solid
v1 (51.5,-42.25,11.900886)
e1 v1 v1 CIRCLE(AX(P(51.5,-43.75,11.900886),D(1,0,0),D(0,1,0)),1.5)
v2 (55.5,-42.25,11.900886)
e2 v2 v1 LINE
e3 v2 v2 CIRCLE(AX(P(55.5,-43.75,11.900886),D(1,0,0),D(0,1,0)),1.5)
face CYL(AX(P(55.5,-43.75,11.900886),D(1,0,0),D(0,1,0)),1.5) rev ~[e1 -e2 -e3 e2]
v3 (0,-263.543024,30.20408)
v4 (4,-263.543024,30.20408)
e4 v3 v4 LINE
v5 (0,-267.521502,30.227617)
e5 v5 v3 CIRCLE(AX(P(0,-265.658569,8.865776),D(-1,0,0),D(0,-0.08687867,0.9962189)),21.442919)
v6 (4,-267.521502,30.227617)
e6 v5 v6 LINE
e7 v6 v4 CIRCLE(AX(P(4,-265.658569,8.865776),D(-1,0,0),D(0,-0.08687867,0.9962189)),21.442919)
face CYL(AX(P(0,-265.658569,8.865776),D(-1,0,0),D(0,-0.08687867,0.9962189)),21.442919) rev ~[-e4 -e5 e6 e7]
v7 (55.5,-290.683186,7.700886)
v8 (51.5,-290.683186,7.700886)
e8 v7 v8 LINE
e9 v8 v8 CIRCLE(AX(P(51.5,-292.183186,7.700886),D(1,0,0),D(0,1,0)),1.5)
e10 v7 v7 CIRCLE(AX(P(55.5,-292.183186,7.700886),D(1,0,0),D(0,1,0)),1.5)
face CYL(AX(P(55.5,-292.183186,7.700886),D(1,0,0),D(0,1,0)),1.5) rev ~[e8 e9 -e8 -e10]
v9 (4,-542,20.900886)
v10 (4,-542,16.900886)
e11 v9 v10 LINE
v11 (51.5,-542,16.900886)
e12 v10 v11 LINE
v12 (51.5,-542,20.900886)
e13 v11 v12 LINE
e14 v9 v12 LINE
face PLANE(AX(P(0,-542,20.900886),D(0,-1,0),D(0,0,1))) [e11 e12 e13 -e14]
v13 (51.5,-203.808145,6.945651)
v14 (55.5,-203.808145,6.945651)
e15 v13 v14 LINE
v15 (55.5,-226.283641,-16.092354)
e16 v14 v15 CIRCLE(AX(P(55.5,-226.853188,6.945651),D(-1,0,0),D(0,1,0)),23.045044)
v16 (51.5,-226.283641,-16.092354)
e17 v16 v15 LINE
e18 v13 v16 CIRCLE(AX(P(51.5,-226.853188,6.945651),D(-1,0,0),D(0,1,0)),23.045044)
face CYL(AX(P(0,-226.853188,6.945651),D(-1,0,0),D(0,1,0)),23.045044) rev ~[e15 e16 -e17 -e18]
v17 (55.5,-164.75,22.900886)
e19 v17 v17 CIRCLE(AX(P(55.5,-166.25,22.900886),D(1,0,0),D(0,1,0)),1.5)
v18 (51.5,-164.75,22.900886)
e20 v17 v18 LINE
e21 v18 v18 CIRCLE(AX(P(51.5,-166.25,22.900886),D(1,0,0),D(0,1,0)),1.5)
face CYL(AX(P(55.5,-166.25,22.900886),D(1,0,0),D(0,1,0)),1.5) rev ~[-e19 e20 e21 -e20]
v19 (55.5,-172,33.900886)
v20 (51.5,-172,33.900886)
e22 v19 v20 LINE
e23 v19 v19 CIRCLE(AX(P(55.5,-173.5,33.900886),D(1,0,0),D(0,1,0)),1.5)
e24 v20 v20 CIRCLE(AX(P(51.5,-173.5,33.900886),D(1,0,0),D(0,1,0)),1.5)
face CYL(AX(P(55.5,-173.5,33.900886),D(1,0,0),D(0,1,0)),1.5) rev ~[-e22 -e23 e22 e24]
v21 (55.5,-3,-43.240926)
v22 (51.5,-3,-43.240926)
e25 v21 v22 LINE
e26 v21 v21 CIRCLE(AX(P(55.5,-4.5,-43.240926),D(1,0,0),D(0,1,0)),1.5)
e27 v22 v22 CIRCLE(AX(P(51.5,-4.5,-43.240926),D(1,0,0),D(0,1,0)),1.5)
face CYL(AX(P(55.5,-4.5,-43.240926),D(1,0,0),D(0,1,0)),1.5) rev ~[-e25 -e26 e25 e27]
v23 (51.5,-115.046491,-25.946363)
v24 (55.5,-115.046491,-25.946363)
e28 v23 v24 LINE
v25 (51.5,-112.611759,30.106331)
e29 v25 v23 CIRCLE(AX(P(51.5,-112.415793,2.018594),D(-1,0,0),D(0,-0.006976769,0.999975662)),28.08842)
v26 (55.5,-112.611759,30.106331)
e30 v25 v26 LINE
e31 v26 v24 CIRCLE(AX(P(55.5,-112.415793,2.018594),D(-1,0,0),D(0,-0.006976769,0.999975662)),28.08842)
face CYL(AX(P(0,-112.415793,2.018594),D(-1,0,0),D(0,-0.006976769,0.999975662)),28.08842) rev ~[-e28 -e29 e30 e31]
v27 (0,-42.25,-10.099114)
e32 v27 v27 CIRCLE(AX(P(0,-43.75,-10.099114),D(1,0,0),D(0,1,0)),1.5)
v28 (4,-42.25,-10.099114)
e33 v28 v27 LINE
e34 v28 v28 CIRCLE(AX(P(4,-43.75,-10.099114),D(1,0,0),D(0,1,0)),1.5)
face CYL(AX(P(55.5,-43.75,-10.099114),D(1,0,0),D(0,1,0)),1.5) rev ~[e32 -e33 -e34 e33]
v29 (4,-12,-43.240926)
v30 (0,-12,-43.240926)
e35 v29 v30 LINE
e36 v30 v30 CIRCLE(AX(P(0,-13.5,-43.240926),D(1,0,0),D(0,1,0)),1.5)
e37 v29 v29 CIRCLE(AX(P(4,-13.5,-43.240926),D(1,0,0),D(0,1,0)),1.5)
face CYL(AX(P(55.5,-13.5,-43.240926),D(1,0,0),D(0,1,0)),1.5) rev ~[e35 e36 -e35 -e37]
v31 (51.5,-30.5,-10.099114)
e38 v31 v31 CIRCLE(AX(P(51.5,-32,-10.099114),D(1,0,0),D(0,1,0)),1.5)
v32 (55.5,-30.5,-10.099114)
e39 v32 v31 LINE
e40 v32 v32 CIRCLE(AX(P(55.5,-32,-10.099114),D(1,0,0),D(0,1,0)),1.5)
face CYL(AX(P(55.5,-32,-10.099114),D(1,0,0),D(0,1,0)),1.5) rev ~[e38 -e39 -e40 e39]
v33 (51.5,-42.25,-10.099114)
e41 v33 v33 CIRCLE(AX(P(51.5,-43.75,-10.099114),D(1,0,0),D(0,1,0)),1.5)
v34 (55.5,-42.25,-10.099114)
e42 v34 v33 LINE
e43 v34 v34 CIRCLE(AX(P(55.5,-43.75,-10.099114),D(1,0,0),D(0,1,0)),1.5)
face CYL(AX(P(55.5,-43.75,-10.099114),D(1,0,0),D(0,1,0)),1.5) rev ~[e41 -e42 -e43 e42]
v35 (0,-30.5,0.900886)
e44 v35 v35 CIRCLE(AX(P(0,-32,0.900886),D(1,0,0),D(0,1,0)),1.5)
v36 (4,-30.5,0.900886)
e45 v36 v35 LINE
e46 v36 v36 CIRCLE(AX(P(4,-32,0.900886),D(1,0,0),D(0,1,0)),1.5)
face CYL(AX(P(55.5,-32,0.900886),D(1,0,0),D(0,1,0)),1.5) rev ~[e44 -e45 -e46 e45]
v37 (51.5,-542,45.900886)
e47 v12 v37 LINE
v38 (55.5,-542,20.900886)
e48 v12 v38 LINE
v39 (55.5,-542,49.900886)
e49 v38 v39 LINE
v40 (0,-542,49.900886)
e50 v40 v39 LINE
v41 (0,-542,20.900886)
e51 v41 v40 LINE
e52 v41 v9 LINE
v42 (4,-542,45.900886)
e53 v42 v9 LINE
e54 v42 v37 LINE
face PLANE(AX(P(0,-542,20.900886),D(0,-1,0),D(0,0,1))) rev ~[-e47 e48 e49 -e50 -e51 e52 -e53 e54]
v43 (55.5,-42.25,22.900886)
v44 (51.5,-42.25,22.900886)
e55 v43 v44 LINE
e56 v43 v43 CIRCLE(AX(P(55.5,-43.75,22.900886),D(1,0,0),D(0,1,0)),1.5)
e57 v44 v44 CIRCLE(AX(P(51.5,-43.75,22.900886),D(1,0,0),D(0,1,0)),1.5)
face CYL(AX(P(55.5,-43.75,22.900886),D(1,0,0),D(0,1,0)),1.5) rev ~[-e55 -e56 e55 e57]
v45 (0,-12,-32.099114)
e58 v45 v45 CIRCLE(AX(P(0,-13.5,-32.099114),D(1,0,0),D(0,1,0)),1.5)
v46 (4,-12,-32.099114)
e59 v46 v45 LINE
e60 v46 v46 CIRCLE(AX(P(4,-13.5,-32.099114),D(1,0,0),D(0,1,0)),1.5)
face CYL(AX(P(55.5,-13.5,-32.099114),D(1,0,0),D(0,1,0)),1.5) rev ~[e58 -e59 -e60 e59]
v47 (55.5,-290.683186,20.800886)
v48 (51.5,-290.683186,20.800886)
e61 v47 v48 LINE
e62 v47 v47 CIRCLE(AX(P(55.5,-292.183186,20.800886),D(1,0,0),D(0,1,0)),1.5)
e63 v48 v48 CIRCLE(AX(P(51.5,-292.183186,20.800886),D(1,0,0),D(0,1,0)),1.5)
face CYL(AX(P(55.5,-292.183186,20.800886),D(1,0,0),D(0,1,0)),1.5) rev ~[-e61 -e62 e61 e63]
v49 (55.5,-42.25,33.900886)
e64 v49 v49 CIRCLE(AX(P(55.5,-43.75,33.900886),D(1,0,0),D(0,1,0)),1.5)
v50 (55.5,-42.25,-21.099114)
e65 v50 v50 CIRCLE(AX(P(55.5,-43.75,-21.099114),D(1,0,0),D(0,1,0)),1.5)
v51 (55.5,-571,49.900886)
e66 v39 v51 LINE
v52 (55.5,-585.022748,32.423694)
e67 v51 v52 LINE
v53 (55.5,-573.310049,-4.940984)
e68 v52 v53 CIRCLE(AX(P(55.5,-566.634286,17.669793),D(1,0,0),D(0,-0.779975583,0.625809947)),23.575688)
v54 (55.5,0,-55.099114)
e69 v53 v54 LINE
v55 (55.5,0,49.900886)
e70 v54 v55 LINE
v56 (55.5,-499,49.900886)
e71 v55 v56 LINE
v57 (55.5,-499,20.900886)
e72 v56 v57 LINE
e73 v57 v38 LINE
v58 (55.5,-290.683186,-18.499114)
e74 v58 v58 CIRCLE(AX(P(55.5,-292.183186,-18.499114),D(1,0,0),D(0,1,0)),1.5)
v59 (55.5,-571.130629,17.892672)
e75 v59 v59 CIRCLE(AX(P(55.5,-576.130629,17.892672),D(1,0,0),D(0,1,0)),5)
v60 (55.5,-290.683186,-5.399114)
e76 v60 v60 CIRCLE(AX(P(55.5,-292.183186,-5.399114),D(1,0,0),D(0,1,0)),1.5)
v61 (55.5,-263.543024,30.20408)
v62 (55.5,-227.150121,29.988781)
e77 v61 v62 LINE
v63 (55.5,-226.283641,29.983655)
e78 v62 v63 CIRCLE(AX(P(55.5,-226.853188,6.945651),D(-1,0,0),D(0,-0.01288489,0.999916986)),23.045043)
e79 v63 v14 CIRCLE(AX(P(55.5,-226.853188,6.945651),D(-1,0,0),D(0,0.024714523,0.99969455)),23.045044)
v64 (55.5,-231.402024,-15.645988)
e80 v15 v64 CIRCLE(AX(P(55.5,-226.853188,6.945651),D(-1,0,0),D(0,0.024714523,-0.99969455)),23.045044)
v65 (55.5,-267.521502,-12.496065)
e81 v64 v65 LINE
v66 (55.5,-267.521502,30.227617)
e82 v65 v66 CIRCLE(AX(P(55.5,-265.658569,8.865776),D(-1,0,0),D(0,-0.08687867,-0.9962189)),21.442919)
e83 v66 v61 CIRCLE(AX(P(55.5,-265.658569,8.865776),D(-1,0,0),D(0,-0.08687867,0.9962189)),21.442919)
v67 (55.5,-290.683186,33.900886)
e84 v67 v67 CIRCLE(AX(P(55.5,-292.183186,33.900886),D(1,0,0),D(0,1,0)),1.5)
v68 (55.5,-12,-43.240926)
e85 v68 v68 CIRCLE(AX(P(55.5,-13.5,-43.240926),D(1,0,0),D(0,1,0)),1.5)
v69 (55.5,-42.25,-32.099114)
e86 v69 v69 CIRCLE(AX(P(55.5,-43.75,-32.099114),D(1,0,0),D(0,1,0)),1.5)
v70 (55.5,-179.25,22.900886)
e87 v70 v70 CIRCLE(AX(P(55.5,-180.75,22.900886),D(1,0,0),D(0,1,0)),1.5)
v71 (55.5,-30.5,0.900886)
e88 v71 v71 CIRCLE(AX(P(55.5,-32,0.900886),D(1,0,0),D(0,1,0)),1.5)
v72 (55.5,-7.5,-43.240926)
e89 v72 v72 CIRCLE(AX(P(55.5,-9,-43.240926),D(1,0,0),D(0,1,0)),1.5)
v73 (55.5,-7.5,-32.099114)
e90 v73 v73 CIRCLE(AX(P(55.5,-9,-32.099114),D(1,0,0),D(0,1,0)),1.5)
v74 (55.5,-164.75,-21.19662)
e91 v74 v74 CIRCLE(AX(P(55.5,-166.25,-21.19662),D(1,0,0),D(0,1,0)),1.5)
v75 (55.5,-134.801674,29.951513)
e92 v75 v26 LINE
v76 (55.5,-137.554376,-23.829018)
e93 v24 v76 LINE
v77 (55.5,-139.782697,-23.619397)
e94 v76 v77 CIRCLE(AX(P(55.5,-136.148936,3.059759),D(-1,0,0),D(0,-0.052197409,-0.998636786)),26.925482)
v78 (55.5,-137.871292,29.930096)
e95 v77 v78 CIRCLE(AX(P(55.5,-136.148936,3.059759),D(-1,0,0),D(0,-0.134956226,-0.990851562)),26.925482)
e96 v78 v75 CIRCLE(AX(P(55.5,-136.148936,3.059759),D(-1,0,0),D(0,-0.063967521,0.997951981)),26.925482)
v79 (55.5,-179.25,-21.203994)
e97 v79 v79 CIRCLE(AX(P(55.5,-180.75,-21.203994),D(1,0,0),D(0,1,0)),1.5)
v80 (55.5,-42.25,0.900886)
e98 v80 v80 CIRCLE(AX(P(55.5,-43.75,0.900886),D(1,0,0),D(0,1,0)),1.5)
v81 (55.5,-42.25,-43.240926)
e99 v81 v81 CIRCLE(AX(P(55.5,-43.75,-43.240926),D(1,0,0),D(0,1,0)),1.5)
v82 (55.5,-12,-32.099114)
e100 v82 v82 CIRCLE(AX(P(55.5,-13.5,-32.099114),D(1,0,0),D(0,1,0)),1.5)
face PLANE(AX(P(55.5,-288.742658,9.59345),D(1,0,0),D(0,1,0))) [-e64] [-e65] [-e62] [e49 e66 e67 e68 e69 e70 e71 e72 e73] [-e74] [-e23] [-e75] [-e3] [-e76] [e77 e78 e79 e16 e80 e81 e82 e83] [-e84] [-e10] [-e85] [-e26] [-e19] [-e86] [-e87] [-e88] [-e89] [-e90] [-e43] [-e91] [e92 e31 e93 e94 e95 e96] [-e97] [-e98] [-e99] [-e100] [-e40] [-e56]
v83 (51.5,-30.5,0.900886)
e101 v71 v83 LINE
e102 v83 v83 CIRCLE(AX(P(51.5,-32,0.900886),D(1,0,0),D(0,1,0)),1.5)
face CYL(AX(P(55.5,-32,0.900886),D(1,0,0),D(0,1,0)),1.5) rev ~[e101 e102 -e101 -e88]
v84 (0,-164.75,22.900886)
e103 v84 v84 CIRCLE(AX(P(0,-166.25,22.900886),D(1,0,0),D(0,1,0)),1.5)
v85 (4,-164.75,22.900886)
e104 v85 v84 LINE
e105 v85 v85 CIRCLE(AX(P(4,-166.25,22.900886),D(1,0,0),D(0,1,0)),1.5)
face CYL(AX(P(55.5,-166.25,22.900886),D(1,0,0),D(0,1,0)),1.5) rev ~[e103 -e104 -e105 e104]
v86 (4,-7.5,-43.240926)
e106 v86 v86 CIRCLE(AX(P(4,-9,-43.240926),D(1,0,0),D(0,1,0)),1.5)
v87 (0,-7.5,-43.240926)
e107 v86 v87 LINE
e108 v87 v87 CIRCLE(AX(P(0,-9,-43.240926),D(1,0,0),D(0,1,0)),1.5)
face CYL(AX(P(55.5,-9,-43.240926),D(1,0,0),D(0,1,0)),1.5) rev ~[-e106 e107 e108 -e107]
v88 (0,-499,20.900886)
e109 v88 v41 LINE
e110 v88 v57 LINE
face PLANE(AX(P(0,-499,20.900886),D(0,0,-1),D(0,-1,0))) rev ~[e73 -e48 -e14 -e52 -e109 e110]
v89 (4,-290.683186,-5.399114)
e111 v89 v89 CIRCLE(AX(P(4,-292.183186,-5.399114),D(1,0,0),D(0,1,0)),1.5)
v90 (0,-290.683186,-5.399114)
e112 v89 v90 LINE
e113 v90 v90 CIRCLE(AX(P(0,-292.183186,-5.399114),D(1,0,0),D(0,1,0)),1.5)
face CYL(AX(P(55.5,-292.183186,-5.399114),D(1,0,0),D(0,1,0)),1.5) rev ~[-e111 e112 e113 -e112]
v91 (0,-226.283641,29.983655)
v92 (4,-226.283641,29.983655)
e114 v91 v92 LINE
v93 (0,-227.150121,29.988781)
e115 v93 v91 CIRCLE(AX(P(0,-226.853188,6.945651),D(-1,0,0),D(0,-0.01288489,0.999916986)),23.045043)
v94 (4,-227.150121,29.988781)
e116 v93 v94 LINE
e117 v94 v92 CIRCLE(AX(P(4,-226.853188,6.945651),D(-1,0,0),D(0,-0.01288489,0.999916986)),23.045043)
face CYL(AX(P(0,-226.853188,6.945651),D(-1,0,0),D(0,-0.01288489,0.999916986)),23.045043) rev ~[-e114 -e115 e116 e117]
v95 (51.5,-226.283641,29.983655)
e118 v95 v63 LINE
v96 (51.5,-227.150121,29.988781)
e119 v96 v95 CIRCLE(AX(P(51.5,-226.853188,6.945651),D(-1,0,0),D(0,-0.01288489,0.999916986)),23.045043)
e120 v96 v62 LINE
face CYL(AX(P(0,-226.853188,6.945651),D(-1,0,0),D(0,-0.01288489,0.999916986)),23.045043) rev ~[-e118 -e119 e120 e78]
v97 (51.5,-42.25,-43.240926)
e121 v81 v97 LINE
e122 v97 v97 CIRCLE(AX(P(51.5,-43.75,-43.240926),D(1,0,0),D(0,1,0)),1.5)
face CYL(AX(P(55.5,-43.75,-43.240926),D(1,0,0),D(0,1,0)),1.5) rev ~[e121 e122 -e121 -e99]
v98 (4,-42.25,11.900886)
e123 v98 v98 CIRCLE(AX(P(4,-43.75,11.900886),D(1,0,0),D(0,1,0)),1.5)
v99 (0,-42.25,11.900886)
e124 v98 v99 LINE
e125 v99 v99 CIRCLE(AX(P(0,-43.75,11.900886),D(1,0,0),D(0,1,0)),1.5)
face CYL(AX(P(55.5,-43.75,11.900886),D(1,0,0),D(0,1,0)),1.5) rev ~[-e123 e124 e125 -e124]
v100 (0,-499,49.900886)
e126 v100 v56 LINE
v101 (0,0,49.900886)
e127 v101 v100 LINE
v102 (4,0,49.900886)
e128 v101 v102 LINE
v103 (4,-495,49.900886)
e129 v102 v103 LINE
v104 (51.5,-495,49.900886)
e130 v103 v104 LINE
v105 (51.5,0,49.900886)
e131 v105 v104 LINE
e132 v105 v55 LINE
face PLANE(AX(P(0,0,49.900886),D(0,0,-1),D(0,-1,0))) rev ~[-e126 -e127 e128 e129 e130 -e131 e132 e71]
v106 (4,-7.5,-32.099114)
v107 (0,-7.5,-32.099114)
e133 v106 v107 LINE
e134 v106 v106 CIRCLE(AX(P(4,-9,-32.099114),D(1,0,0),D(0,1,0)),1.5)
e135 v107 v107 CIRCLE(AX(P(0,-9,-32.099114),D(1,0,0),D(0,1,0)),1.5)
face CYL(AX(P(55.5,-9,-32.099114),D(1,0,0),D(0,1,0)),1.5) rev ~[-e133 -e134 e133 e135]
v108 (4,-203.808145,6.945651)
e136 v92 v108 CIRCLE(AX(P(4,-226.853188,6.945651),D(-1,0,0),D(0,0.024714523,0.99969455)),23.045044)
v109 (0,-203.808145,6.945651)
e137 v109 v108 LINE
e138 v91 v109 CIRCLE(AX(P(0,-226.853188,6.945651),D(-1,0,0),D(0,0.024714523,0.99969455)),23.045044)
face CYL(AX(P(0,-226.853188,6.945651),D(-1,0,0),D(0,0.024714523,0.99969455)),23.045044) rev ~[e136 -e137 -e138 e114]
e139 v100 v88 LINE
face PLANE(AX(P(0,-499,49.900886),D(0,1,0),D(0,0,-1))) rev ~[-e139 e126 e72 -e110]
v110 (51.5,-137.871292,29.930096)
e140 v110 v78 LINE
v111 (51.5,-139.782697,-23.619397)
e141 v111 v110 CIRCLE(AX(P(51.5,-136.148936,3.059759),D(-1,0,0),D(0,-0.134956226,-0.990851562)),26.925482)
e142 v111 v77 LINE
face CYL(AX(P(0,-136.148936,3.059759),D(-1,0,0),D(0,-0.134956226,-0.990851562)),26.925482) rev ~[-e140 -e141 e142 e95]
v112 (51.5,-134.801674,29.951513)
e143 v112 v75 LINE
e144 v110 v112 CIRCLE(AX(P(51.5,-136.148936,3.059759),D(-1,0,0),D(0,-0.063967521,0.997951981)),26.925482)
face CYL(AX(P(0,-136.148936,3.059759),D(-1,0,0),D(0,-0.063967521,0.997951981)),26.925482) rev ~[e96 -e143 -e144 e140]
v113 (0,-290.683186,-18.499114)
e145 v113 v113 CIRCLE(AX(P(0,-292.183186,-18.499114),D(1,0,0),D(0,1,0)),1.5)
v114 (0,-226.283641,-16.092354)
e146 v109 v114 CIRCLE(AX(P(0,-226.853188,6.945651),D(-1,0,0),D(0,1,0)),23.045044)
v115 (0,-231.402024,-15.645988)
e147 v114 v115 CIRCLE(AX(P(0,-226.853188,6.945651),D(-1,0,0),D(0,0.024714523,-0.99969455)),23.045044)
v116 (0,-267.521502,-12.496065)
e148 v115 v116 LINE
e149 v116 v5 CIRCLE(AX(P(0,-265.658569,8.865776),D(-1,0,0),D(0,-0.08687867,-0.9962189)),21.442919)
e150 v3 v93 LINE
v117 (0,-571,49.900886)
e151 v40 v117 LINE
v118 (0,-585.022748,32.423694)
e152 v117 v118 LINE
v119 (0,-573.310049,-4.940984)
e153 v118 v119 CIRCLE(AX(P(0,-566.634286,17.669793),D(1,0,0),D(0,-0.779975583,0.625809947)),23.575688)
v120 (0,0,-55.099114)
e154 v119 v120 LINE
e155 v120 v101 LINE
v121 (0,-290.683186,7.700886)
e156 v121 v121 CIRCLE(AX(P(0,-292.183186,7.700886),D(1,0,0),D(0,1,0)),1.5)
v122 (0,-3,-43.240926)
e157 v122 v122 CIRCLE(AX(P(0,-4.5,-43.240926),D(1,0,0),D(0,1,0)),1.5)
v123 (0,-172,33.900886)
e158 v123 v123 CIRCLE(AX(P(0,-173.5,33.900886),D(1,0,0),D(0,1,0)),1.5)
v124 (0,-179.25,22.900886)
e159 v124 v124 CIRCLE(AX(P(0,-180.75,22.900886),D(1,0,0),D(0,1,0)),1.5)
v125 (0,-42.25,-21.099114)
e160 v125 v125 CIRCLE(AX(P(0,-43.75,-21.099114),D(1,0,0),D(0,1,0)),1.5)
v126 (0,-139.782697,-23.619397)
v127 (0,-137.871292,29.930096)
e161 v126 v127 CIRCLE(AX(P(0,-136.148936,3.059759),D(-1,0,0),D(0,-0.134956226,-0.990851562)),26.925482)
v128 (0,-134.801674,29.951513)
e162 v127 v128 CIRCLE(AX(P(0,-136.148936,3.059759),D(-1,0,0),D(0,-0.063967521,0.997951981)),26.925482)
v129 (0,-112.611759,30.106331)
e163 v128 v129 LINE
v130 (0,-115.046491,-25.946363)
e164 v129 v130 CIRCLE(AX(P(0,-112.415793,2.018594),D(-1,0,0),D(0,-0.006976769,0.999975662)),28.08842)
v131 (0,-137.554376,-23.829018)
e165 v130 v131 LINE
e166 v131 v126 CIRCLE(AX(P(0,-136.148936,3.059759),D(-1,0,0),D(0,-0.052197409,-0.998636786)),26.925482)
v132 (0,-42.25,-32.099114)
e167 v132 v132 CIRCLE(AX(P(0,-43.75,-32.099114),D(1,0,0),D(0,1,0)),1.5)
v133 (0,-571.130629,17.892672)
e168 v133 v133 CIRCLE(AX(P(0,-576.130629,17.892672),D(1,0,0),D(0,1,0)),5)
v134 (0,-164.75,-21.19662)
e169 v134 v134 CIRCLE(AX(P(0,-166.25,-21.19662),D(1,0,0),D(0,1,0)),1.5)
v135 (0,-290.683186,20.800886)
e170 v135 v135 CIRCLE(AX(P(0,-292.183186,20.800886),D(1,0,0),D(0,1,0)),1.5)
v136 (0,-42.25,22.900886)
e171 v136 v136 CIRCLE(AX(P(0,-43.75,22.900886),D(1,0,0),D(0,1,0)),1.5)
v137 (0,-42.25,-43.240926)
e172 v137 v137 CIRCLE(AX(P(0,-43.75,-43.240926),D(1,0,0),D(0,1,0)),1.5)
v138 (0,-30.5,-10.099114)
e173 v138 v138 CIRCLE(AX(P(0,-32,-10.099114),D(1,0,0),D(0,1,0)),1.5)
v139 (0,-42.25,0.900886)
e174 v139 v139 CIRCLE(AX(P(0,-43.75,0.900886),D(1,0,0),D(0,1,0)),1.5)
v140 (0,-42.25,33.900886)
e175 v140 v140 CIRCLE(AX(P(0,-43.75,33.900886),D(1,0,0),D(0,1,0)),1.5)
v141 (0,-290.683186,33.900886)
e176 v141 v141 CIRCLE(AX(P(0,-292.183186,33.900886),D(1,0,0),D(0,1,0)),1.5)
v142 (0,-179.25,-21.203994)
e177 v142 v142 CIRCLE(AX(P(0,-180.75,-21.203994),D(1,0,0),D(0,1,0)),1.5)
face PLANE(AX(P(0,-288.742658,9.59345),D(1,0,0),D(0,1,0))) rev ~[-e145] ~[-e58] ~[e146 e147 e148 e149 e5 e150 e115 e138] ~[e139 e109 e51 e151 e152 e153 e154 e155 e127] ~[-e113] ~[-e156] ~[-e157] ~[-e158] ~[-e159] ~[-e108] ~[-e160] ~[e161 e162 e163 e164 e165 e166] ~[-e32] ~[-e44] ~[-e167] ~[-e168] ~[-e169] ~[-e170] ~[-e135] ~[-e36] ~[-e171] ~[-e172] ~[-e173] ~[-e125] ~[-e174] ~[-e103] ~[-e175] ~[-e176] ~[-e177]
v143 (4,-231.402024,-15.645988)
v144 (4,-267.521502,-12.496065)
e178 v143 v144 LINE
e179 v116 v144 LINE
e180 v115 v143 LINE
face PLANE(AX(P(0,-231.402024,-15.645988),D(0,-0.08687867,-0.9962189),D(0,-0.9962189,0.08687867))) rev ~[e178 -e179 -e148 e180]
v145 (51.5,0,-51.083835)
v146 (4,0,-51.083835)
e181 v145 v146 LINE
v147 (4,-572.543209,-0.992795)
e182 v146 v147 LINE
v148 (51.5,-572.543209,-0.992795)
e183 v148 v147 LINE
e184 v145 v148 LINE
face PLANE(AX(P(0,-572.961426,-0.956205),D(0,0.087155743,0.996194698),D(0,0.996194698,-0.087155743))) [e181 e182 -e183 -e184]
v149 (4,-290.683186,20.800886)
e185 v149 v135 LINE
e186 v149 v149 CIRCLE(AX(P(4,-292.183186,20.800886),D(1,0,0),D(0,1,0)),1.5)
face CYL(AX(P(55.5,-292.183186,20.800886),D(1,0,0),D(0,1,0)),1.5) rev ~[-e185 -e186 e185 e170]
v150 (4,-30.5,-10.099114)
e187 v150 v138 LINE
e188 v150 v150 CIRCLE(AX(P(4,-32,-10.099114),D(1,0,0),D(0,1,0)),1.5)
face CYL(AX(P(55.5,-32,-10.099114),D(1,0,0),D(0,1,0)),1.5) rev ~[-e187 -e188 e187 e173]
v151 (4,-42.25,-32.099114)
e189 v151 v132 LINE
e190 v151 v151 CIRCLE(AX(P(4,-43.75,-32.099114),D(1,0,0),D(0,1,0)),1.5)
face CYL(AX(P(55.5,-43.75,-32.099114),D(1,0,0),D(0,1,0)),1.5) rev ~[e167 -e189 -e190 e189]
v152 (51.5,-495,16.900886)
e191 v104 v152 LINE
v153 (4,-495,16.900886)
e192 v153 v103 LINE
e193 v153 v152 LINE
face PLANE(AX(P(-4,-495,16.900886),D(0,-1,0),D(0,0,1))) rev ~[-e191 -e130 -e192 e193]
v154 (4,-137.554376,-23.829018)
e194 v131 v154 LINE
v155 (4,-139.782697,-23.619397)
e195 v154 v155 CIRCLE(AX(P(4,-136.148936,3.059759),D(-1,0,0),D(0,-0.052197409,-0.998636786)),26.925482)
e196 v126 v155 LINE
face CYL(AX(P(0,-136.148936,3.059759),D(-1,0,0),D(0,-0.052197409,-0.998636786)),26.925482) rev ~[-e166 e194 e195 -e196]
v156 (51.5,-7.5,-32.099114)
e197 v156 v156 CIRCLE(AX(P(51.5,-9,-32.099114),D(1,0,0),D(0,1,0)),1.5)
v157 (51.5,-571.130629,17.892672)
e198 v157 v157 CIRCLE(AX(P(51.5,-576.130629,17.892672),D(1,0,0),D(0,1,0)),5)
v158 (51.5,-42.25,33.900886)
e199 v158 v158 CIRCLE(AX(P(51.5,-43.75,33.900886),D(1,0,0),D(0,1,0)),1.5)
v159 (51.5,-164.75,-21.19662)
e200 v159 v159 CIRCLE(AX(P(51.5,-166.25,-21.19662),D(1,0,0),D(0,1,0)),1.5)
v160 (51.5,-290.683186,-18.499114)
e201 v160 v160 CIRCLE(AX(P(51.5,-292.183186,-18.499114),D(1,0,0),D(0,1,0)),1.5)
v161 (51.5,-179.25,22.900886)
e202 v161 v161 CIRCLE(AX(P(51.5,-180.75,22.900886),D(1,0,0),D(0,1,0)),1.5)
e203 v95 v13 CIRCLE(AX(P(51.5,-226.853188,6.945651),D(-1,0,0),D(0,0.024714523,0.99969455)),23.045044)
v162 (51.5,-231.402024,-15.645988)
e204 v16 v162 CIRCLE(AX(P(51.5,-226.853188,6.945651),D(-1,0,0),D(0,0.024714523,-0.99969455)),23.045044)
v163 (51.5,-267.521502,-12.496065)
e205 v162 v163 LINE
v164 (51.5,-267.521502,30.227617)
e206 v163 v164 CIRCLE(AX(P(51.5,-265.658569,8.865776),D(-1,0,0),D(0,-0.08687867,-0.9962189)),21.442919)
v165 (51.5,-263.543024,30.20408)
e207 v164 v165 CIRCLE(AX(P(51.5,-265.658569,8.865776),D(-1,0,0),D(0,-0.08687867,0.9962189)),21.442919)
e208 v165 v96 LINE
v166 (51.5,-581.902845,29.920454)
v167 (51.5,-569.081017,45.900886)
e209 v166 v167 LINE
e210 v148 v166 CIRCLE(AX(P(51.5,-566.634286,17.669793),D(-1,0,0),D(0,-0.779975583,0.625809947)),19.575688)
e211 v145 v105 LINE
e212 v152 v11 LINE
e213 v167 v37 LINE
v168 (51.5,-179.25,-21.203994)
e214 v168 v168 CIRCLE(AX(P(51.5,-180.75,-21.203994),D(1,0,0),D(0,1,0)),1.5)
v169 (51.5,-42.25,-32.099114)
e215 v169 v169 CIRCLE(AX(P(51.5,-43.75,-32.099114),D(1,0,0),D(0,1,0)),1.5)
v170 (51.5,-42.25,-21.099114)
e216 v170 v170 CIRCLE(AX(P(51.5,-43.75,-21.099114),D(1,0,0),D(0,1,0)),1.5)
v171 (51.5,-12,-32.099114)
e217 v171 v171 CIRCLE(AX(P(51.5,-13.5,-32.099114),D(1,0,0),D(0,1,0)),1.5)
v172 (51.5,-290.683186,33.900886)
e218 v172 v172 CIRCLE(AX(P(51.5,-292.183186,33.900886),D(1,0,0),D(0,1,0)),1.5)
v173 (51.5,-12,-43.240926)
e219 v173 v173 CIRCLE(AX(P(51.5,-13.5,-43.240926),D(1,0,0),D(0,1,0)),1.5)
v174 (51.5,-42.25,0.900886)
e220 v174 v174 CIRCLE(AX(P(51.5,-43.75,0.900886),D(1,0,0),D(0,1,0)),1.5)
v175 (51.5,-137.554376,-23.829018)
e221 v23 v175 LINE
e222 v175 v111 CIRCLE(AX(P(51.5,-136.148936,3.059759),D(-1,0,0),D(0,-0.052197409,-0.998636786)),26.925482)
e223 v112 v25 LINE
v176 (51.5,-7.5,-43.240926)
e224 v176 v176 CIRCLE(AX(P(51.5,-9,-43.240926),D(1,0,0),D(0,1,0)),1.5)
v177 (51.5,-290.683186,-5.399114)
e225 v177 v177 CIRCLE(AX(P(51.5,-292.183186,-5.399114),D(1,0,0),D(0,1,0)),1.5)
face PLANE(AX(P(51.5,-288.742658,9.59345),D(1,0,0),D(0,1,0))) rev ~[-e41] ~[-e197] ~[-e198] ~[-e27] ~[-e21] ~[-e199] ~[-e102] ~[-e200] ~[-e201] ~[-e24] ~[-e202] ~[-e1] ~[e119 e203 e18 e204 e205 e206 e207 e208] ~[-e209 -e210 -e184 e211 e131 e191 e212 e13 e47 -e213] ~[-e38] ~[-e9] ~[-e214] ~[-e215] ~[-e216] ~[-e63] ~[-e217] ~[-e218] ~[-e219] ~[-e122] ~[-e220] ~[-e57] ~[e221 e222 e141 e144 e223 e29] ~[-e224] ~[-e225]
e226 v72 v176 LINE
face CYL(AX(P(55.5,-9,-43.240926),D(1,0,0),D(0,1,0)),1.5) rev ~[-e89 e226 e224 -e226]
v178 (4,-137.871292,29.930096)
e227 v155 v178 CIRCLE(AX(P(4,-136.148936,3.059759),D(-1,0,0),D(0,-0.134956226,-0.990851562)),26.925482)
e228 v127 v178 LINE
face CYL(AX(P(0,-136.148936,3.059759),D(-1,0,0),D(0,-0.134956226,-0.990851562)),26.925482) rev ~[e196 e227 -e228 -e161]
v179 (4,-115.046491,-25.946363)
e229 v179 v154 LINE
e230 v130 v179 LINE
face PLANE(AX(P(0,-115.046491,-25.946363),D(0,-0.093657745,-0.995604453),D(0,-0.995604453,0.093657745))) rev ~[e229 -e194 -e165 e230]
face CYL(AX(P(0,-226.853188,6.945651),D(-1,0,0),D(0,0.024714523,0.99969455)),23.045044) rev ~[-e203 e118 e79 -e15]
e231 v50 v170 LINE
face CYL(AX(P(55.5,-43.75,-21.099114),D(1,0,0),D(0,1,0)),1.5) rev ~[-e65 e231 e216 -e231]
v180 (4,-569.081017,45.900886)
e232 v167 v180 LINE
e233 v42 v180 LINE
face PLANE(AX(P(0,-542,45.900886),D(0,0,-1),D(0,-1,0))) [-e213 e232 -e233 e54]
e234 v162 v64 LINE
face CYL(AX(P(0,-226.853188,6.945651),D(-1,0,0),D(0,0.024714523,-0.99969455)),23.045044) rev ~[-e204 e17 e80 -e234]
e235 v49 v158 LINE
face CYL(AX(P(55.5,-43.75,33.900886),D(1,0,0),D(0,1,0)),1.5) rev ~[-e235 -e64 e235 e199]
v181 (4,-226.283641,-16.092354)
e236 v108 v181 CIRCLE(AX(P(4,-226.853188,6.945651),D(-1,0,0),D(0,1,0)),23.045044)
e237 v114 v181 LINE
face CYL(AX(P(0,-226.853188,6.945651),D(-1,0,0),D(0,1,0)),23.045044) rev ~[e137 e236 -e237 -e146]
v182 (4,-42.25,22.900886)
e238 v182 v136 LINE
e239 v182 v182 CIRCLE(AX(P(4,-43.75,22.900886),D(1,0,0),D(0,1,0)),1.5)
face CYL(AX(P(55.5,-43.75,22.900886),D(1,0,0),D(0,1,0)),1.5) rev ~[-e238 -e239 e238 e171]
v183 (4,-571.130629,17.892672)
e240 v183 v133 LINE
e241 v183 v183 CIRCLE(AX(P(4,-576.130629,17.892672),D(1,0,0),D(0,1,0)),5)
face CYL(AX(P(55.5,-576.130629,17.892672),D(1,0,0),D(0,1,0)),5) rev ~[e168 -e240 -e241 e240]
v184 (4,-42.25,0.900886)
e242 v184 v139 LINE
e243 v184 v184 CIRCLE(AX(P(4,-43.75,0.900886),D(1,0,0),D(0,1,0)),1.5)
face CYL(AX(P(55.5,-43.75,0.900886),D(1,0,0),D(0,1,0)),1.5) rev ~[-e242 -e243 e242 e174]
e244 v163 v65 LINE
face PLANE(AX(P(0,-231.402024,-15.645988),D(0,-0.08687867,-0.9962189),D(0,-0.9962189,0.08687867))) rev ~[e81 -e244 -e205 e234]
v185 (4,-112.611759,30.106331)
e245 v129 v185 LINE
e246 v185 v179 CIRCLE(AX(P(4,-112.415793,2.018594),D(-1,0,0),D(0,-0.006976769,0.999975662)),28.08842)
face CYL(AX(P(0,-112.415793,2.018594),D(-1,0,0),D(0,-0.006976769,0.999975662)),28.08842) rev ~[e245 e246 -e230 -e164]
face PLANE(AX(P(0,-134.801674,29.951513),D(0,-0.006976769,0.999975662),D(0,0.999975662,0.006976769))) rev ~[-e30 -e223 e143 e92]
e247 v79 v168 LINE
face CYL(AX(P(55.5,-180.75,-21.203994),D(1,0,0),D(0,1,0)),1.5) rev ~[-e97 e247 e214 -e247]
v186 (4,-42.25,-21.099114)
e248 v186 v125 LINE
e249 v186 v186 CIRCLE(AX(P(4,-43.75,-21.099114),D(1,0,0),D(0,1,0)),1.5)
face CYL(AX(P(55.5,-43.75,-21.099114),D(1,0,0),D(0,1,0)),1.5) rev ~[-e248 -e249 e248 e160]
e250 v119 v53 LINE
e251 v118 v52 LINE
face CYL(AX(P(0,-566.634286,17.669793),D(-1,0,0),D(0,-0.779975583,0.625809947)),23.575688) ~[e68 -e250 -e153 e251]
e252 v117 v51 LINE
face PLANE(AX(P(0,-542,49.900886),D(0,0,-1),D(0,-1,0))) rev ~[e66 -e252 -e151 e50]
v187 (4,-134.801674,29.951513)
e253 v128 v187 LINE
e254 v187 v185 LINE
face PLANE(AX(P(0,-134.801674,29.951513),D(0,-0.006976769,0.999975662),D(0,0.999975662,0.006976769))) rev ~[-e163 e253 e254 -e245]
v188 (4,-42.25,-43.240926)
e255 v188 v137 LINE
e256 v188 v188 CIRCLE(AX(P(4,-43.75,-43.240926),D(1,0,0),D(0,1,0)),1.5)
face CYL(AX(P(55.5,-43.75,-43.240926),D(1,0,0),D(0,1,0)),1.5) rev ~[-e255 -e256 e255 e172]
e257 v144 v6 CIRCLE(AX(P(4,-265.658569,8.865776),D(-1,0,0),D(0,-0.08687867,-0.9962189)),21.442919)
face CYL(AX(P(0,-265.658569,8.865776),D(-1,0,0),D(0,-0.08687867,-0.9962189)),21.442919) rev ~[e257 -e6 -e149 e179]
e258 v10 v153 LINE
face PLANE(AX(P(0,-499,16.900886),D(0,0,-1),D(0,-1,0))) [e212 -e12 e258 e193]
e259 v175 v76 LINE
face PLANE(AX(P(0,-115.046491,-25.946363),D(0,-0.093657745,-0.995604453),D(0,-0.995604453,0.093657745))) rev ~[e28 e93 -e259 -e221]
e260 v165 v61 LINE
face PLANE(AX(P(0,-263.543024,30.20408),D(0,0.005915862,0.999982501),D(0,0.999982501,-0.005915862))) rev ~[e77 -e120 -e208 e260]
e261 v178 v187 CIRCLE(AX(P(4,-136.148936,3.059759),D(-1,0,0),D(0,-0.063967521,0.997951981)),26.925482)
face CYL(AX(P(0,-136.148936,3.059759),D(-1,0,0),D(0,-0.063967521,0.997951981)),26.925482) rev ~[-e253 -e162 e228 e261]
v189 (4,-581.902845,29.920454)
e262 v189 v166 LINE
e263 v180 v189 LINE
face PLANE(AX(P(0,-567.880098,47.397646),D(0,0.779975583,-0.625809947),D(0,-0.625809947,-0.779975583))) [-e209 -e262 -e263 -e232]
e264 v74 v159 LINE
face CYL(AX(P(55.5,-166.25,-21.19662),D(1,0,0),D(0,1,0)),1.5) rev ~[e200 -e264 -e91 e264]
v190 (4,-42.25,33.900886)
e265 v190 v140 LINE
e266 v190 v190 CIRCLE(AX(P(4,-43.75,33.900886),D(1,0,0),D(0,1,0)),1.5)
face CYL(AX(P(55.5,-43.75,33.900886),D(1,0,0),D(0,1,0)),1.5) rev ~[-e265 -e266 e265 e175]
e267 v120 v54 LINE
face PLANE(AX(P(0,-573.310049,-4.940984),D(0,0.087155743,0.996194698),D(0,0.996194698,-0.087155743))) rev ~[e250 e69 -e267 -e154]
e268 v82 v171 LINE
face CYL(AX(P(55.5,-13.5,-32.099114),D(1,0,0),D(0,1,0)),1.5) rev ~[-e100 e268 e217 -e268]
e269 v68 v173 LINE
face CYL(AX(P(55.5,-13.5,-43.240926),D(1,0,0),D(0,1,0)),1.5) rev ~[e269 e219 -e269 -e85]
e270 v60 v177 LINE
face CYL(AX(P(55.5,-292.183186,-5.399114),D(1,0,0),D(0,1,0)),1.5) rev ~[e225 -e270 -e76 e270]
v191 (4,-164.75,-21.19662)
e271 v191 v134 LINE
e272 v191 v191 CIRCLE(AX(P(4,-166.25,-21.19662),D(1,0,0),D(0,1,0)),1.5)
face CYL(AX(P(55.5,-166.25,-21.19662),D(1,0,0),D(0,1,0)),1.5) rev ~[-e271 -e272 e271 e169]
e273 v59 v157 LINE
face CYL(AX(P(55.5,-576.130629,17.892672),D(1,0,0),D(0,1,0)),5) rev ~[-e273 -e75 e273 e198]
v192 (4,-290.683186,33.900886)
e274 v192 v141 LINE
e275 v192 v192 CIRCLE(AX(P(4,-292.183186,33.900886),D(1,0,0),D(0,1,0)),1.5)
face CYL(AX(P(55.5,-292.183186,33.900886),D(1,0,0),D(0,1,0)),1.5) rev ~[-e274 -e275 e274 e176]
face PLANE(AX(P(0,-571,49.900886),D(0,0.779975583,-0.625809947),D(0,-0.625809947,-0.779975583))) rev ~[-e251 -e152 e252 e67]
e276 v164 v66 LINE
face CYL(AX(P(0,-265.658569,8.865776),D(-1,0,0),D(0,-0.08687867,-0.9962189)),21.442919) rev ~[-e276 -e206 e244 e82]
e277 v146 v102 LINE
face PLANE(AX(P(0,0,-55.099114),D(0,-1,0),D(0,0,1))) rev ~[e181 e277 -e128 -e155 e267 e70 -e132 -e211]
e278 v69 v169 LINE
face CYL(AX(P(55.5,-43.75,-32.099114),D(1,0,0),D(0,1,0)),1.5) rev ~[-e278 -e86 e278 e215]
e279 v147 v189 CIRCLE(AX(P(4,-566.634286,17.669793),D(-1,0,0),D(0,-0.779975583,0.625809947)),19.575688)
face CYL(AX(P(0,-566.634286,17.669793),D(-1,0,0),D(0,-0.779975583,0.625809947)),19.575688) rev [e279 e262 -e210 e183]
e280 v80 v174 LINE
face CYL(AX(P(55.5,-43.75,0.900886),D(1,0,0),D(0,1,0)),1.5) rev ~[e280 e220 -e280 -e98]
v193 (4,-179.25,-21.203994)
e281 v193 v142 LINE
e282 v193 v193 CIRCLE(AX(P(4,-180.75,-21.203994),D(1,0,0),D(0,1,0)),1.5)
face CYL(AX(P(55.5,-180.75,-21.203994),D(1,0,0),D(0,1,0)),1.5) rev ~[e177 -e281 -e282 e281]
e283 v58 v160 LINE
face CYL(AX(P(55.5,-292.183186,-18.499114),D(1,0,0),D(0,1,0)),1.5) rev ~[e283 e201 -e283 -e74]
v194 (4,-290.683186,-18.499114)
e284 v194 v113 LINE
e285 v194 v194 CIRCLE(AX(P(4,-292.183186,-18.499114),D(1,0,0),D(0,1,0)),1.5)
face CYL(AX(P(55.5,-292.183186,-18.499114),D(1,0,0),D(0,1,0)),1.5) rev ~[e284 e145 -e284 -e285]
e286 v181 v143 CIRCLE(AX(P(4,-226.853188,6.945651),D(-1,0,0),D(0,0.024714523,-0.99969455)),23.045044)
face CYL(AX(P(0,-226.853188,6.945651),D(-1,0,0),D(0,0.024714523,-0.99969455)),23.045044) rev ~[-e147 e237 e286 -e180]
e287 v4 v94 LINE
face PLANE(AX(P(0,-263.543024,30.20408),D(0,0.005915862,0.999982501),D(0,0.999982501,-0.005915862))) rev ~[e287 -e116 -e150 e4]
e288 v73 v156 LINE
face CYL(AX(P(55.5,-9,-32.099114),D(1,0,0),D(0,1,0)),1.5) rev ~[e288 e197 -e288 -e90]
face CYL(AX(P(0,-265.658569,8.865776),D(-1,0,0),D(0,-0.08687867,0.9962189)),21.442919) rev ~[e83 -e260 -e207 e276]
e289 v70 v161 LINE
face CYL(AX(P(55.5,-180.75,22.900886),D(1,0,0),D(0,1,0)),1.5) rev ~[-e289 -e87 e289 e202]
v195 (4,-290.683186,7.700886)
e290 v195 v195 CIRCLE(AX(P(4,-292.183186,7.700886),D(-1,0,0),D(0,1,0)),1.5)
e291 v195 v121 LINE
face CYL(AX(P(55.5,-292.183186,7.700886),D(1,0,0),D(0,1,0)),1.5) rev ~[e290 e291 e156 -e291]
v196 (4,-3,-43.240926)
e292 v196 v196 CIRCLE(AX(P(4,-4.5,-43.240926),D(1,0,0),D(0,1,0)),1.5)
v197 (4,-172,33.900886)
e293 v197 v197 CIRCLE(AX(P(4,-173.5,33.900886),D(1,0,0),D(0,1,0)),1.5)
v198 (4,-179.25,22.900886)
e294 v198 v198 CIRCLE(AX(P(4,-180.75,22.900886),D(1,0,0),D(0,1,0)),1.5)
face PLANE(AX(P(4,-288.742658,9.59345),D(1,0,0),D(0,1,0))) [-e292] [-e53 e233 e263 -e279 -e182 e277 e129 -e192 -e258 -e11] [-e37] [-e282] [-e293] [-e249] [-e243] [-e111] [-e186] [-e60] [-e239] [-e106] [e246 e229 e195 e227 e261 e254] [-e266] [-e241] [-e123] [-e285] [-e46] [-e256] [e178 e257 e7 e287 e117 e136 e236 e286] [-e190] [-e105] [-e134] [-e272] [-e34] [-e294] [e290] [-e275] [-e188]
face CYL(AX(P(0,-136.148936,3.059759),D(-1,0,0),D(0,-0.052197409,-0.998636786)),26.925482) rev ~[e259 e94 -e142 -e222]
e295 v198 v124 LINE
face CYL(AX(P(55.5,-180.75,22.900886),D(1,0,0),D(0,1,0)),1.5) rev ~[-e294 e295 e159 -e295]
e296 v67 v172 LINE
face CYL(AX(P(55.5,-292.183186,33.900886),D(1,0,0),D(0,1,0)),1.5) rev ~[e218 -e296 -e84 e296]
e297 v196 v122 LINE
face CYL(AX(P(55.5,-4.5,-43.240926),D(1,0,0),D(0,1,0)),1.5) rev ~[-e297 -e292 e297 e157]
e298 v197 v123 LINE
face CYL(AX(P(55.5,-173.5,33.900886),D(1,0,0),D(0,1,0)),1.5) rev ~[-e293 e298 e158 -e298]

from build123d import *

# Parameters (mm, degrees)
F1_DEPTH    = 55.5
F2_T        = 4
F2_T3_DEPTH = 63.5
F3_R        = 1.5
F3_R_2      = 5
F4_DEPTH    = 132
F6_START    = -4
F6_DEPTH    = 47.5


# Not quite as in the source:
# - a shell that OpenCascade refuses in one call is made with other operations: the cavity is built on its own and cut out


with BuildPart() as f1:
    # F0 (on Right) → F1 (new body)
    with BuildSketch(Plane.YZ):
        with BuildLine():
            Line((0, -55.0991142094), (0, 49.9008857906))
            Line((0, 49.9008857906), (-499, 49.9008857906))
            Line((-499, 49.9008857906), (-499, 20.9008857906))
            Line((-499, 20.9008857906), (-542, 20.9008857906))
            Line((-542, 20.9008857906), (-542, 49.9008857906))
            Line((-542, 49.9008857906), (-571, 49.9008857906))
            Line((-571, 49.9008857906), (-585.0227475166, 32.4236936867))
            ThreePointArc((-585.0227475166, 32.4236936867), (-589.1305886162, 10.6178817454), (-573.3100487518, -4.9409842581))
            Line((-573.3100487518, -4.9409842581), (0, -55.0991142094))
        make_face()
        with BuildLine():
            ThreePointArc((-267.5215016214, -12.4960653082), (-287.1014882349, 8.865775765), (-267.5215016214, 30.2276168381))
            ThreePointArc((-267.5215016214, 30.2276168381), (-265.5317159892, 30.3083194328), (-263.5430244658, 30.2040803041))
            Line((-263.5430244658, 30.2040803041), (-227.1501212267, 29.9887811395))
            ThreePointArc((-227.1501212267, 29.9887811395), (-226.7168570765, 29.9902909304), (-226.2836411156, 29.983655073))
            ThreePointArc((-226.2836411156, 29.983655073), (-210.3577454889, 23.0383320758), (-203.8081448594, 6.9456506758))
            ThreePointArc((-203.8081448594, 6.9456506758), (-210.3577454889, -9.1470307242), (-226.2836411156, -16.0923537213))
            ThreePointArc((-226.2836411156, -16.0923537213), (-228.8553111139, -16.012257226), (-231.40202441, -15.6459876318))
            Line((-231.40202441, -15.6459876318), (-267.5215016214, -12.4960653082))
        make_face(mode=Mode.SUBTRACT)
        with BuildLine():
            ThreePointArc((-112.6117591226, 30.1063306123), (-92.6236860119, 21.9492705288), (-84.3273722818, 2.0185938124))
            ThreePointArc((-84.3273722818, 2.0185938124), (-93.5072337014, -18.7521971721), (-115.0464908191, -25.9463626291))
            Line((-115.0464908191, -25.9463626291), (-137.5543760441, -23.8290179612))
            ThreePointArc((-137.5543760441, -23.8290179612), (-138.6707155639, -23.7473709318), (-139.7826970584, -23.6193970408))
            ThreePointArc((-139.7826970584, -23.6193970408), (-163.0572812206, 4.0202298169), (-137.871291965, 29.9300963926))
            ThreePointArc((-137.871291965, 29.9300963926), (-136.3367885283, 29.9845849808), (-134.8016741863, 29.9515129286))
            Line((-134.8016741863, 29.9515129286), (-112.6117591226, 30.1063306123))
        make_face(mode=Mode.SUBTRACT)
    extrude(amount=F1_DEPTH)

    # F2: shell of thickness 4, made by hand


with BuildPart() as f2_core1:
    # F2_t2: copy of F1
    add(f1.part)

    # the walls: a layer under each face that stays
    f2_faces = [f2_core1.faces().sort_by_distance(p)[0] for p in [
        (55.5, -295.1049872852, -2.5991142094),
        (27.75, -163.0392168361, 4.4361103036),
        (27.75, -126.3004334316, -24.8876902951),
        (27.75, -84.3538324473, 0.7996810334),
        (27.75, -123.7067166544, 30.0289217705),
        (27.75, -203.9075264936, 4.8077471556),
        (27.75, -245.3465728463, 30.0964307218),
        (27.75, -287.0090157551, 10.8550491528),
        (27.75, -249.4617630157, -14.07102647),
        (27.75, -589.1305886162, 10.6178817454),
        (27.75, -578.0113737583, 41.1622897387),
        (27.75, -556.5, 49.9008857906),
        (27.75, -520.5, 20.9008857906),
        (27.75, -499, 35.4008857906),
        (0, -295.1049872852, -2.5991142094),
        (27.75, -286.6550243759, -30.0200492338),
    ]]
    thicken(f2_faces, amount=-F2_T, mode=Mode.SUBTRACT)

    # F2_s4 → F2_t3 (cut)
    with BuildSketch(Plane.YZ.offset(-4)):
        Polygon((-499.04, 20.9408857906), (-499, 16.9008857906), (-495, 16.9008857906), (-495, 20.9008857906), align=None)
    extrude(amount=F2_T3_DEPTH, mode=Mode.SUBTRACT)


with BuildPart() as f1_1:
    add(f1.part)

    # what is left inside the walls is the cavity
    f2_cavity = [f2_core1.part.solids().sort_by_distance(p)[0] for p in [
        (51.46, -293.104987, -17.422261),
    ]]
    add(f2_cavity, mode=Mode.SUBTRACT)

    # F3 (on face) → F4 (cut)
    with BuildSketch(Plane.YZ.offset(55.5)):
        with Locations((-43.75, 33.9008857906)):
            Circle(F3_R)
        with Locations((-43.75, 22.9008857906)):
            Circle(F3_R)
        with Locations((-43.75, 11.9008857906)):
            Circle(F3_R)
        with Locations((-43.75, 0.9008857906)):
            Circle(F3_R)
        with Locations((-43.75, -10.0991142094)):
            Circle(F3_R)
        with Locations((-43.75, -21.0991142094)):
            Circle(F3_R)
        with Locations((-43.75, -43.2409264798)):
            Circle(F3_R)
        with Locations((-43.75, -32.0991142094)):
            Circle(F3_R)
        with Locations((-32, 0.9008857906)):
            Circle(F3_R)
        with Locations((-32, -10.0991142094)):
            Circle(F3_R)
        with Locations((-4.5, -43.2409264798)):
            Circle(F3_R)
        with Locations((-9, -43.2409264798)):
            Circle(F3_R)
        with Locations((-9, -32.0991142094)):
            Circle(F3_R)
        with Locations((-13.5, -32.0991142094)):
            Circle(F3_R)
        with Locations((-13.5, -43.2409264798)):
            Circle(F3_R)
        with Locations((-166.25, -21.1966199487)):
            Circle(F3_R)
        with Locations((-180.75, 22.9008857906)):
            Circle(F3_R)
        with Locations((-180.75, -21.2039937677)):
            Circle(F3_R)
        with Locations((-166.25, 22.9008857906)):
            Circle(F3_R)
        with Locations((-173.5, 33.9008857906)):
            Circle(F3_R)
        with Locations((-292.1831863405, 33.9008857906)):
            Circle(F3_R)
        with Locations((-292.1831863405, -18.4991142094)):
            Circle(F3_R)
        with Locations((-292.1831863405, 20.8008857906)):
            Circle(F3_R)
        with Locations((-292.1831863405, 7.7008857906)):
            Circle(F3_R)
        with Locations((-292.1831863405, -5.3991142094)):
            Circle(F3_R)
        with Locations((-576.1306285858, 17.892671749)):
            Circle(F3_R_2)
    extrude(amount=-F4_DEPTH, mode=Mode.SUBTRACT)

    # F5 (on face) → F6 (cut)
    with BuildSketch(Plane.YZ.offset(55.5).offset(F6_START)):
        Polygon((-77.8550534083, 42.2289334238), (-298.9033162594, 42.2289334238), (-298.9033162594, -20.6155626995), (-77.8550534083, -39.8928311294), align=None)
    extrude(amount=-F6_DEPTH, mode=Mode.SUBTRACT)


solid = f1_1.part
